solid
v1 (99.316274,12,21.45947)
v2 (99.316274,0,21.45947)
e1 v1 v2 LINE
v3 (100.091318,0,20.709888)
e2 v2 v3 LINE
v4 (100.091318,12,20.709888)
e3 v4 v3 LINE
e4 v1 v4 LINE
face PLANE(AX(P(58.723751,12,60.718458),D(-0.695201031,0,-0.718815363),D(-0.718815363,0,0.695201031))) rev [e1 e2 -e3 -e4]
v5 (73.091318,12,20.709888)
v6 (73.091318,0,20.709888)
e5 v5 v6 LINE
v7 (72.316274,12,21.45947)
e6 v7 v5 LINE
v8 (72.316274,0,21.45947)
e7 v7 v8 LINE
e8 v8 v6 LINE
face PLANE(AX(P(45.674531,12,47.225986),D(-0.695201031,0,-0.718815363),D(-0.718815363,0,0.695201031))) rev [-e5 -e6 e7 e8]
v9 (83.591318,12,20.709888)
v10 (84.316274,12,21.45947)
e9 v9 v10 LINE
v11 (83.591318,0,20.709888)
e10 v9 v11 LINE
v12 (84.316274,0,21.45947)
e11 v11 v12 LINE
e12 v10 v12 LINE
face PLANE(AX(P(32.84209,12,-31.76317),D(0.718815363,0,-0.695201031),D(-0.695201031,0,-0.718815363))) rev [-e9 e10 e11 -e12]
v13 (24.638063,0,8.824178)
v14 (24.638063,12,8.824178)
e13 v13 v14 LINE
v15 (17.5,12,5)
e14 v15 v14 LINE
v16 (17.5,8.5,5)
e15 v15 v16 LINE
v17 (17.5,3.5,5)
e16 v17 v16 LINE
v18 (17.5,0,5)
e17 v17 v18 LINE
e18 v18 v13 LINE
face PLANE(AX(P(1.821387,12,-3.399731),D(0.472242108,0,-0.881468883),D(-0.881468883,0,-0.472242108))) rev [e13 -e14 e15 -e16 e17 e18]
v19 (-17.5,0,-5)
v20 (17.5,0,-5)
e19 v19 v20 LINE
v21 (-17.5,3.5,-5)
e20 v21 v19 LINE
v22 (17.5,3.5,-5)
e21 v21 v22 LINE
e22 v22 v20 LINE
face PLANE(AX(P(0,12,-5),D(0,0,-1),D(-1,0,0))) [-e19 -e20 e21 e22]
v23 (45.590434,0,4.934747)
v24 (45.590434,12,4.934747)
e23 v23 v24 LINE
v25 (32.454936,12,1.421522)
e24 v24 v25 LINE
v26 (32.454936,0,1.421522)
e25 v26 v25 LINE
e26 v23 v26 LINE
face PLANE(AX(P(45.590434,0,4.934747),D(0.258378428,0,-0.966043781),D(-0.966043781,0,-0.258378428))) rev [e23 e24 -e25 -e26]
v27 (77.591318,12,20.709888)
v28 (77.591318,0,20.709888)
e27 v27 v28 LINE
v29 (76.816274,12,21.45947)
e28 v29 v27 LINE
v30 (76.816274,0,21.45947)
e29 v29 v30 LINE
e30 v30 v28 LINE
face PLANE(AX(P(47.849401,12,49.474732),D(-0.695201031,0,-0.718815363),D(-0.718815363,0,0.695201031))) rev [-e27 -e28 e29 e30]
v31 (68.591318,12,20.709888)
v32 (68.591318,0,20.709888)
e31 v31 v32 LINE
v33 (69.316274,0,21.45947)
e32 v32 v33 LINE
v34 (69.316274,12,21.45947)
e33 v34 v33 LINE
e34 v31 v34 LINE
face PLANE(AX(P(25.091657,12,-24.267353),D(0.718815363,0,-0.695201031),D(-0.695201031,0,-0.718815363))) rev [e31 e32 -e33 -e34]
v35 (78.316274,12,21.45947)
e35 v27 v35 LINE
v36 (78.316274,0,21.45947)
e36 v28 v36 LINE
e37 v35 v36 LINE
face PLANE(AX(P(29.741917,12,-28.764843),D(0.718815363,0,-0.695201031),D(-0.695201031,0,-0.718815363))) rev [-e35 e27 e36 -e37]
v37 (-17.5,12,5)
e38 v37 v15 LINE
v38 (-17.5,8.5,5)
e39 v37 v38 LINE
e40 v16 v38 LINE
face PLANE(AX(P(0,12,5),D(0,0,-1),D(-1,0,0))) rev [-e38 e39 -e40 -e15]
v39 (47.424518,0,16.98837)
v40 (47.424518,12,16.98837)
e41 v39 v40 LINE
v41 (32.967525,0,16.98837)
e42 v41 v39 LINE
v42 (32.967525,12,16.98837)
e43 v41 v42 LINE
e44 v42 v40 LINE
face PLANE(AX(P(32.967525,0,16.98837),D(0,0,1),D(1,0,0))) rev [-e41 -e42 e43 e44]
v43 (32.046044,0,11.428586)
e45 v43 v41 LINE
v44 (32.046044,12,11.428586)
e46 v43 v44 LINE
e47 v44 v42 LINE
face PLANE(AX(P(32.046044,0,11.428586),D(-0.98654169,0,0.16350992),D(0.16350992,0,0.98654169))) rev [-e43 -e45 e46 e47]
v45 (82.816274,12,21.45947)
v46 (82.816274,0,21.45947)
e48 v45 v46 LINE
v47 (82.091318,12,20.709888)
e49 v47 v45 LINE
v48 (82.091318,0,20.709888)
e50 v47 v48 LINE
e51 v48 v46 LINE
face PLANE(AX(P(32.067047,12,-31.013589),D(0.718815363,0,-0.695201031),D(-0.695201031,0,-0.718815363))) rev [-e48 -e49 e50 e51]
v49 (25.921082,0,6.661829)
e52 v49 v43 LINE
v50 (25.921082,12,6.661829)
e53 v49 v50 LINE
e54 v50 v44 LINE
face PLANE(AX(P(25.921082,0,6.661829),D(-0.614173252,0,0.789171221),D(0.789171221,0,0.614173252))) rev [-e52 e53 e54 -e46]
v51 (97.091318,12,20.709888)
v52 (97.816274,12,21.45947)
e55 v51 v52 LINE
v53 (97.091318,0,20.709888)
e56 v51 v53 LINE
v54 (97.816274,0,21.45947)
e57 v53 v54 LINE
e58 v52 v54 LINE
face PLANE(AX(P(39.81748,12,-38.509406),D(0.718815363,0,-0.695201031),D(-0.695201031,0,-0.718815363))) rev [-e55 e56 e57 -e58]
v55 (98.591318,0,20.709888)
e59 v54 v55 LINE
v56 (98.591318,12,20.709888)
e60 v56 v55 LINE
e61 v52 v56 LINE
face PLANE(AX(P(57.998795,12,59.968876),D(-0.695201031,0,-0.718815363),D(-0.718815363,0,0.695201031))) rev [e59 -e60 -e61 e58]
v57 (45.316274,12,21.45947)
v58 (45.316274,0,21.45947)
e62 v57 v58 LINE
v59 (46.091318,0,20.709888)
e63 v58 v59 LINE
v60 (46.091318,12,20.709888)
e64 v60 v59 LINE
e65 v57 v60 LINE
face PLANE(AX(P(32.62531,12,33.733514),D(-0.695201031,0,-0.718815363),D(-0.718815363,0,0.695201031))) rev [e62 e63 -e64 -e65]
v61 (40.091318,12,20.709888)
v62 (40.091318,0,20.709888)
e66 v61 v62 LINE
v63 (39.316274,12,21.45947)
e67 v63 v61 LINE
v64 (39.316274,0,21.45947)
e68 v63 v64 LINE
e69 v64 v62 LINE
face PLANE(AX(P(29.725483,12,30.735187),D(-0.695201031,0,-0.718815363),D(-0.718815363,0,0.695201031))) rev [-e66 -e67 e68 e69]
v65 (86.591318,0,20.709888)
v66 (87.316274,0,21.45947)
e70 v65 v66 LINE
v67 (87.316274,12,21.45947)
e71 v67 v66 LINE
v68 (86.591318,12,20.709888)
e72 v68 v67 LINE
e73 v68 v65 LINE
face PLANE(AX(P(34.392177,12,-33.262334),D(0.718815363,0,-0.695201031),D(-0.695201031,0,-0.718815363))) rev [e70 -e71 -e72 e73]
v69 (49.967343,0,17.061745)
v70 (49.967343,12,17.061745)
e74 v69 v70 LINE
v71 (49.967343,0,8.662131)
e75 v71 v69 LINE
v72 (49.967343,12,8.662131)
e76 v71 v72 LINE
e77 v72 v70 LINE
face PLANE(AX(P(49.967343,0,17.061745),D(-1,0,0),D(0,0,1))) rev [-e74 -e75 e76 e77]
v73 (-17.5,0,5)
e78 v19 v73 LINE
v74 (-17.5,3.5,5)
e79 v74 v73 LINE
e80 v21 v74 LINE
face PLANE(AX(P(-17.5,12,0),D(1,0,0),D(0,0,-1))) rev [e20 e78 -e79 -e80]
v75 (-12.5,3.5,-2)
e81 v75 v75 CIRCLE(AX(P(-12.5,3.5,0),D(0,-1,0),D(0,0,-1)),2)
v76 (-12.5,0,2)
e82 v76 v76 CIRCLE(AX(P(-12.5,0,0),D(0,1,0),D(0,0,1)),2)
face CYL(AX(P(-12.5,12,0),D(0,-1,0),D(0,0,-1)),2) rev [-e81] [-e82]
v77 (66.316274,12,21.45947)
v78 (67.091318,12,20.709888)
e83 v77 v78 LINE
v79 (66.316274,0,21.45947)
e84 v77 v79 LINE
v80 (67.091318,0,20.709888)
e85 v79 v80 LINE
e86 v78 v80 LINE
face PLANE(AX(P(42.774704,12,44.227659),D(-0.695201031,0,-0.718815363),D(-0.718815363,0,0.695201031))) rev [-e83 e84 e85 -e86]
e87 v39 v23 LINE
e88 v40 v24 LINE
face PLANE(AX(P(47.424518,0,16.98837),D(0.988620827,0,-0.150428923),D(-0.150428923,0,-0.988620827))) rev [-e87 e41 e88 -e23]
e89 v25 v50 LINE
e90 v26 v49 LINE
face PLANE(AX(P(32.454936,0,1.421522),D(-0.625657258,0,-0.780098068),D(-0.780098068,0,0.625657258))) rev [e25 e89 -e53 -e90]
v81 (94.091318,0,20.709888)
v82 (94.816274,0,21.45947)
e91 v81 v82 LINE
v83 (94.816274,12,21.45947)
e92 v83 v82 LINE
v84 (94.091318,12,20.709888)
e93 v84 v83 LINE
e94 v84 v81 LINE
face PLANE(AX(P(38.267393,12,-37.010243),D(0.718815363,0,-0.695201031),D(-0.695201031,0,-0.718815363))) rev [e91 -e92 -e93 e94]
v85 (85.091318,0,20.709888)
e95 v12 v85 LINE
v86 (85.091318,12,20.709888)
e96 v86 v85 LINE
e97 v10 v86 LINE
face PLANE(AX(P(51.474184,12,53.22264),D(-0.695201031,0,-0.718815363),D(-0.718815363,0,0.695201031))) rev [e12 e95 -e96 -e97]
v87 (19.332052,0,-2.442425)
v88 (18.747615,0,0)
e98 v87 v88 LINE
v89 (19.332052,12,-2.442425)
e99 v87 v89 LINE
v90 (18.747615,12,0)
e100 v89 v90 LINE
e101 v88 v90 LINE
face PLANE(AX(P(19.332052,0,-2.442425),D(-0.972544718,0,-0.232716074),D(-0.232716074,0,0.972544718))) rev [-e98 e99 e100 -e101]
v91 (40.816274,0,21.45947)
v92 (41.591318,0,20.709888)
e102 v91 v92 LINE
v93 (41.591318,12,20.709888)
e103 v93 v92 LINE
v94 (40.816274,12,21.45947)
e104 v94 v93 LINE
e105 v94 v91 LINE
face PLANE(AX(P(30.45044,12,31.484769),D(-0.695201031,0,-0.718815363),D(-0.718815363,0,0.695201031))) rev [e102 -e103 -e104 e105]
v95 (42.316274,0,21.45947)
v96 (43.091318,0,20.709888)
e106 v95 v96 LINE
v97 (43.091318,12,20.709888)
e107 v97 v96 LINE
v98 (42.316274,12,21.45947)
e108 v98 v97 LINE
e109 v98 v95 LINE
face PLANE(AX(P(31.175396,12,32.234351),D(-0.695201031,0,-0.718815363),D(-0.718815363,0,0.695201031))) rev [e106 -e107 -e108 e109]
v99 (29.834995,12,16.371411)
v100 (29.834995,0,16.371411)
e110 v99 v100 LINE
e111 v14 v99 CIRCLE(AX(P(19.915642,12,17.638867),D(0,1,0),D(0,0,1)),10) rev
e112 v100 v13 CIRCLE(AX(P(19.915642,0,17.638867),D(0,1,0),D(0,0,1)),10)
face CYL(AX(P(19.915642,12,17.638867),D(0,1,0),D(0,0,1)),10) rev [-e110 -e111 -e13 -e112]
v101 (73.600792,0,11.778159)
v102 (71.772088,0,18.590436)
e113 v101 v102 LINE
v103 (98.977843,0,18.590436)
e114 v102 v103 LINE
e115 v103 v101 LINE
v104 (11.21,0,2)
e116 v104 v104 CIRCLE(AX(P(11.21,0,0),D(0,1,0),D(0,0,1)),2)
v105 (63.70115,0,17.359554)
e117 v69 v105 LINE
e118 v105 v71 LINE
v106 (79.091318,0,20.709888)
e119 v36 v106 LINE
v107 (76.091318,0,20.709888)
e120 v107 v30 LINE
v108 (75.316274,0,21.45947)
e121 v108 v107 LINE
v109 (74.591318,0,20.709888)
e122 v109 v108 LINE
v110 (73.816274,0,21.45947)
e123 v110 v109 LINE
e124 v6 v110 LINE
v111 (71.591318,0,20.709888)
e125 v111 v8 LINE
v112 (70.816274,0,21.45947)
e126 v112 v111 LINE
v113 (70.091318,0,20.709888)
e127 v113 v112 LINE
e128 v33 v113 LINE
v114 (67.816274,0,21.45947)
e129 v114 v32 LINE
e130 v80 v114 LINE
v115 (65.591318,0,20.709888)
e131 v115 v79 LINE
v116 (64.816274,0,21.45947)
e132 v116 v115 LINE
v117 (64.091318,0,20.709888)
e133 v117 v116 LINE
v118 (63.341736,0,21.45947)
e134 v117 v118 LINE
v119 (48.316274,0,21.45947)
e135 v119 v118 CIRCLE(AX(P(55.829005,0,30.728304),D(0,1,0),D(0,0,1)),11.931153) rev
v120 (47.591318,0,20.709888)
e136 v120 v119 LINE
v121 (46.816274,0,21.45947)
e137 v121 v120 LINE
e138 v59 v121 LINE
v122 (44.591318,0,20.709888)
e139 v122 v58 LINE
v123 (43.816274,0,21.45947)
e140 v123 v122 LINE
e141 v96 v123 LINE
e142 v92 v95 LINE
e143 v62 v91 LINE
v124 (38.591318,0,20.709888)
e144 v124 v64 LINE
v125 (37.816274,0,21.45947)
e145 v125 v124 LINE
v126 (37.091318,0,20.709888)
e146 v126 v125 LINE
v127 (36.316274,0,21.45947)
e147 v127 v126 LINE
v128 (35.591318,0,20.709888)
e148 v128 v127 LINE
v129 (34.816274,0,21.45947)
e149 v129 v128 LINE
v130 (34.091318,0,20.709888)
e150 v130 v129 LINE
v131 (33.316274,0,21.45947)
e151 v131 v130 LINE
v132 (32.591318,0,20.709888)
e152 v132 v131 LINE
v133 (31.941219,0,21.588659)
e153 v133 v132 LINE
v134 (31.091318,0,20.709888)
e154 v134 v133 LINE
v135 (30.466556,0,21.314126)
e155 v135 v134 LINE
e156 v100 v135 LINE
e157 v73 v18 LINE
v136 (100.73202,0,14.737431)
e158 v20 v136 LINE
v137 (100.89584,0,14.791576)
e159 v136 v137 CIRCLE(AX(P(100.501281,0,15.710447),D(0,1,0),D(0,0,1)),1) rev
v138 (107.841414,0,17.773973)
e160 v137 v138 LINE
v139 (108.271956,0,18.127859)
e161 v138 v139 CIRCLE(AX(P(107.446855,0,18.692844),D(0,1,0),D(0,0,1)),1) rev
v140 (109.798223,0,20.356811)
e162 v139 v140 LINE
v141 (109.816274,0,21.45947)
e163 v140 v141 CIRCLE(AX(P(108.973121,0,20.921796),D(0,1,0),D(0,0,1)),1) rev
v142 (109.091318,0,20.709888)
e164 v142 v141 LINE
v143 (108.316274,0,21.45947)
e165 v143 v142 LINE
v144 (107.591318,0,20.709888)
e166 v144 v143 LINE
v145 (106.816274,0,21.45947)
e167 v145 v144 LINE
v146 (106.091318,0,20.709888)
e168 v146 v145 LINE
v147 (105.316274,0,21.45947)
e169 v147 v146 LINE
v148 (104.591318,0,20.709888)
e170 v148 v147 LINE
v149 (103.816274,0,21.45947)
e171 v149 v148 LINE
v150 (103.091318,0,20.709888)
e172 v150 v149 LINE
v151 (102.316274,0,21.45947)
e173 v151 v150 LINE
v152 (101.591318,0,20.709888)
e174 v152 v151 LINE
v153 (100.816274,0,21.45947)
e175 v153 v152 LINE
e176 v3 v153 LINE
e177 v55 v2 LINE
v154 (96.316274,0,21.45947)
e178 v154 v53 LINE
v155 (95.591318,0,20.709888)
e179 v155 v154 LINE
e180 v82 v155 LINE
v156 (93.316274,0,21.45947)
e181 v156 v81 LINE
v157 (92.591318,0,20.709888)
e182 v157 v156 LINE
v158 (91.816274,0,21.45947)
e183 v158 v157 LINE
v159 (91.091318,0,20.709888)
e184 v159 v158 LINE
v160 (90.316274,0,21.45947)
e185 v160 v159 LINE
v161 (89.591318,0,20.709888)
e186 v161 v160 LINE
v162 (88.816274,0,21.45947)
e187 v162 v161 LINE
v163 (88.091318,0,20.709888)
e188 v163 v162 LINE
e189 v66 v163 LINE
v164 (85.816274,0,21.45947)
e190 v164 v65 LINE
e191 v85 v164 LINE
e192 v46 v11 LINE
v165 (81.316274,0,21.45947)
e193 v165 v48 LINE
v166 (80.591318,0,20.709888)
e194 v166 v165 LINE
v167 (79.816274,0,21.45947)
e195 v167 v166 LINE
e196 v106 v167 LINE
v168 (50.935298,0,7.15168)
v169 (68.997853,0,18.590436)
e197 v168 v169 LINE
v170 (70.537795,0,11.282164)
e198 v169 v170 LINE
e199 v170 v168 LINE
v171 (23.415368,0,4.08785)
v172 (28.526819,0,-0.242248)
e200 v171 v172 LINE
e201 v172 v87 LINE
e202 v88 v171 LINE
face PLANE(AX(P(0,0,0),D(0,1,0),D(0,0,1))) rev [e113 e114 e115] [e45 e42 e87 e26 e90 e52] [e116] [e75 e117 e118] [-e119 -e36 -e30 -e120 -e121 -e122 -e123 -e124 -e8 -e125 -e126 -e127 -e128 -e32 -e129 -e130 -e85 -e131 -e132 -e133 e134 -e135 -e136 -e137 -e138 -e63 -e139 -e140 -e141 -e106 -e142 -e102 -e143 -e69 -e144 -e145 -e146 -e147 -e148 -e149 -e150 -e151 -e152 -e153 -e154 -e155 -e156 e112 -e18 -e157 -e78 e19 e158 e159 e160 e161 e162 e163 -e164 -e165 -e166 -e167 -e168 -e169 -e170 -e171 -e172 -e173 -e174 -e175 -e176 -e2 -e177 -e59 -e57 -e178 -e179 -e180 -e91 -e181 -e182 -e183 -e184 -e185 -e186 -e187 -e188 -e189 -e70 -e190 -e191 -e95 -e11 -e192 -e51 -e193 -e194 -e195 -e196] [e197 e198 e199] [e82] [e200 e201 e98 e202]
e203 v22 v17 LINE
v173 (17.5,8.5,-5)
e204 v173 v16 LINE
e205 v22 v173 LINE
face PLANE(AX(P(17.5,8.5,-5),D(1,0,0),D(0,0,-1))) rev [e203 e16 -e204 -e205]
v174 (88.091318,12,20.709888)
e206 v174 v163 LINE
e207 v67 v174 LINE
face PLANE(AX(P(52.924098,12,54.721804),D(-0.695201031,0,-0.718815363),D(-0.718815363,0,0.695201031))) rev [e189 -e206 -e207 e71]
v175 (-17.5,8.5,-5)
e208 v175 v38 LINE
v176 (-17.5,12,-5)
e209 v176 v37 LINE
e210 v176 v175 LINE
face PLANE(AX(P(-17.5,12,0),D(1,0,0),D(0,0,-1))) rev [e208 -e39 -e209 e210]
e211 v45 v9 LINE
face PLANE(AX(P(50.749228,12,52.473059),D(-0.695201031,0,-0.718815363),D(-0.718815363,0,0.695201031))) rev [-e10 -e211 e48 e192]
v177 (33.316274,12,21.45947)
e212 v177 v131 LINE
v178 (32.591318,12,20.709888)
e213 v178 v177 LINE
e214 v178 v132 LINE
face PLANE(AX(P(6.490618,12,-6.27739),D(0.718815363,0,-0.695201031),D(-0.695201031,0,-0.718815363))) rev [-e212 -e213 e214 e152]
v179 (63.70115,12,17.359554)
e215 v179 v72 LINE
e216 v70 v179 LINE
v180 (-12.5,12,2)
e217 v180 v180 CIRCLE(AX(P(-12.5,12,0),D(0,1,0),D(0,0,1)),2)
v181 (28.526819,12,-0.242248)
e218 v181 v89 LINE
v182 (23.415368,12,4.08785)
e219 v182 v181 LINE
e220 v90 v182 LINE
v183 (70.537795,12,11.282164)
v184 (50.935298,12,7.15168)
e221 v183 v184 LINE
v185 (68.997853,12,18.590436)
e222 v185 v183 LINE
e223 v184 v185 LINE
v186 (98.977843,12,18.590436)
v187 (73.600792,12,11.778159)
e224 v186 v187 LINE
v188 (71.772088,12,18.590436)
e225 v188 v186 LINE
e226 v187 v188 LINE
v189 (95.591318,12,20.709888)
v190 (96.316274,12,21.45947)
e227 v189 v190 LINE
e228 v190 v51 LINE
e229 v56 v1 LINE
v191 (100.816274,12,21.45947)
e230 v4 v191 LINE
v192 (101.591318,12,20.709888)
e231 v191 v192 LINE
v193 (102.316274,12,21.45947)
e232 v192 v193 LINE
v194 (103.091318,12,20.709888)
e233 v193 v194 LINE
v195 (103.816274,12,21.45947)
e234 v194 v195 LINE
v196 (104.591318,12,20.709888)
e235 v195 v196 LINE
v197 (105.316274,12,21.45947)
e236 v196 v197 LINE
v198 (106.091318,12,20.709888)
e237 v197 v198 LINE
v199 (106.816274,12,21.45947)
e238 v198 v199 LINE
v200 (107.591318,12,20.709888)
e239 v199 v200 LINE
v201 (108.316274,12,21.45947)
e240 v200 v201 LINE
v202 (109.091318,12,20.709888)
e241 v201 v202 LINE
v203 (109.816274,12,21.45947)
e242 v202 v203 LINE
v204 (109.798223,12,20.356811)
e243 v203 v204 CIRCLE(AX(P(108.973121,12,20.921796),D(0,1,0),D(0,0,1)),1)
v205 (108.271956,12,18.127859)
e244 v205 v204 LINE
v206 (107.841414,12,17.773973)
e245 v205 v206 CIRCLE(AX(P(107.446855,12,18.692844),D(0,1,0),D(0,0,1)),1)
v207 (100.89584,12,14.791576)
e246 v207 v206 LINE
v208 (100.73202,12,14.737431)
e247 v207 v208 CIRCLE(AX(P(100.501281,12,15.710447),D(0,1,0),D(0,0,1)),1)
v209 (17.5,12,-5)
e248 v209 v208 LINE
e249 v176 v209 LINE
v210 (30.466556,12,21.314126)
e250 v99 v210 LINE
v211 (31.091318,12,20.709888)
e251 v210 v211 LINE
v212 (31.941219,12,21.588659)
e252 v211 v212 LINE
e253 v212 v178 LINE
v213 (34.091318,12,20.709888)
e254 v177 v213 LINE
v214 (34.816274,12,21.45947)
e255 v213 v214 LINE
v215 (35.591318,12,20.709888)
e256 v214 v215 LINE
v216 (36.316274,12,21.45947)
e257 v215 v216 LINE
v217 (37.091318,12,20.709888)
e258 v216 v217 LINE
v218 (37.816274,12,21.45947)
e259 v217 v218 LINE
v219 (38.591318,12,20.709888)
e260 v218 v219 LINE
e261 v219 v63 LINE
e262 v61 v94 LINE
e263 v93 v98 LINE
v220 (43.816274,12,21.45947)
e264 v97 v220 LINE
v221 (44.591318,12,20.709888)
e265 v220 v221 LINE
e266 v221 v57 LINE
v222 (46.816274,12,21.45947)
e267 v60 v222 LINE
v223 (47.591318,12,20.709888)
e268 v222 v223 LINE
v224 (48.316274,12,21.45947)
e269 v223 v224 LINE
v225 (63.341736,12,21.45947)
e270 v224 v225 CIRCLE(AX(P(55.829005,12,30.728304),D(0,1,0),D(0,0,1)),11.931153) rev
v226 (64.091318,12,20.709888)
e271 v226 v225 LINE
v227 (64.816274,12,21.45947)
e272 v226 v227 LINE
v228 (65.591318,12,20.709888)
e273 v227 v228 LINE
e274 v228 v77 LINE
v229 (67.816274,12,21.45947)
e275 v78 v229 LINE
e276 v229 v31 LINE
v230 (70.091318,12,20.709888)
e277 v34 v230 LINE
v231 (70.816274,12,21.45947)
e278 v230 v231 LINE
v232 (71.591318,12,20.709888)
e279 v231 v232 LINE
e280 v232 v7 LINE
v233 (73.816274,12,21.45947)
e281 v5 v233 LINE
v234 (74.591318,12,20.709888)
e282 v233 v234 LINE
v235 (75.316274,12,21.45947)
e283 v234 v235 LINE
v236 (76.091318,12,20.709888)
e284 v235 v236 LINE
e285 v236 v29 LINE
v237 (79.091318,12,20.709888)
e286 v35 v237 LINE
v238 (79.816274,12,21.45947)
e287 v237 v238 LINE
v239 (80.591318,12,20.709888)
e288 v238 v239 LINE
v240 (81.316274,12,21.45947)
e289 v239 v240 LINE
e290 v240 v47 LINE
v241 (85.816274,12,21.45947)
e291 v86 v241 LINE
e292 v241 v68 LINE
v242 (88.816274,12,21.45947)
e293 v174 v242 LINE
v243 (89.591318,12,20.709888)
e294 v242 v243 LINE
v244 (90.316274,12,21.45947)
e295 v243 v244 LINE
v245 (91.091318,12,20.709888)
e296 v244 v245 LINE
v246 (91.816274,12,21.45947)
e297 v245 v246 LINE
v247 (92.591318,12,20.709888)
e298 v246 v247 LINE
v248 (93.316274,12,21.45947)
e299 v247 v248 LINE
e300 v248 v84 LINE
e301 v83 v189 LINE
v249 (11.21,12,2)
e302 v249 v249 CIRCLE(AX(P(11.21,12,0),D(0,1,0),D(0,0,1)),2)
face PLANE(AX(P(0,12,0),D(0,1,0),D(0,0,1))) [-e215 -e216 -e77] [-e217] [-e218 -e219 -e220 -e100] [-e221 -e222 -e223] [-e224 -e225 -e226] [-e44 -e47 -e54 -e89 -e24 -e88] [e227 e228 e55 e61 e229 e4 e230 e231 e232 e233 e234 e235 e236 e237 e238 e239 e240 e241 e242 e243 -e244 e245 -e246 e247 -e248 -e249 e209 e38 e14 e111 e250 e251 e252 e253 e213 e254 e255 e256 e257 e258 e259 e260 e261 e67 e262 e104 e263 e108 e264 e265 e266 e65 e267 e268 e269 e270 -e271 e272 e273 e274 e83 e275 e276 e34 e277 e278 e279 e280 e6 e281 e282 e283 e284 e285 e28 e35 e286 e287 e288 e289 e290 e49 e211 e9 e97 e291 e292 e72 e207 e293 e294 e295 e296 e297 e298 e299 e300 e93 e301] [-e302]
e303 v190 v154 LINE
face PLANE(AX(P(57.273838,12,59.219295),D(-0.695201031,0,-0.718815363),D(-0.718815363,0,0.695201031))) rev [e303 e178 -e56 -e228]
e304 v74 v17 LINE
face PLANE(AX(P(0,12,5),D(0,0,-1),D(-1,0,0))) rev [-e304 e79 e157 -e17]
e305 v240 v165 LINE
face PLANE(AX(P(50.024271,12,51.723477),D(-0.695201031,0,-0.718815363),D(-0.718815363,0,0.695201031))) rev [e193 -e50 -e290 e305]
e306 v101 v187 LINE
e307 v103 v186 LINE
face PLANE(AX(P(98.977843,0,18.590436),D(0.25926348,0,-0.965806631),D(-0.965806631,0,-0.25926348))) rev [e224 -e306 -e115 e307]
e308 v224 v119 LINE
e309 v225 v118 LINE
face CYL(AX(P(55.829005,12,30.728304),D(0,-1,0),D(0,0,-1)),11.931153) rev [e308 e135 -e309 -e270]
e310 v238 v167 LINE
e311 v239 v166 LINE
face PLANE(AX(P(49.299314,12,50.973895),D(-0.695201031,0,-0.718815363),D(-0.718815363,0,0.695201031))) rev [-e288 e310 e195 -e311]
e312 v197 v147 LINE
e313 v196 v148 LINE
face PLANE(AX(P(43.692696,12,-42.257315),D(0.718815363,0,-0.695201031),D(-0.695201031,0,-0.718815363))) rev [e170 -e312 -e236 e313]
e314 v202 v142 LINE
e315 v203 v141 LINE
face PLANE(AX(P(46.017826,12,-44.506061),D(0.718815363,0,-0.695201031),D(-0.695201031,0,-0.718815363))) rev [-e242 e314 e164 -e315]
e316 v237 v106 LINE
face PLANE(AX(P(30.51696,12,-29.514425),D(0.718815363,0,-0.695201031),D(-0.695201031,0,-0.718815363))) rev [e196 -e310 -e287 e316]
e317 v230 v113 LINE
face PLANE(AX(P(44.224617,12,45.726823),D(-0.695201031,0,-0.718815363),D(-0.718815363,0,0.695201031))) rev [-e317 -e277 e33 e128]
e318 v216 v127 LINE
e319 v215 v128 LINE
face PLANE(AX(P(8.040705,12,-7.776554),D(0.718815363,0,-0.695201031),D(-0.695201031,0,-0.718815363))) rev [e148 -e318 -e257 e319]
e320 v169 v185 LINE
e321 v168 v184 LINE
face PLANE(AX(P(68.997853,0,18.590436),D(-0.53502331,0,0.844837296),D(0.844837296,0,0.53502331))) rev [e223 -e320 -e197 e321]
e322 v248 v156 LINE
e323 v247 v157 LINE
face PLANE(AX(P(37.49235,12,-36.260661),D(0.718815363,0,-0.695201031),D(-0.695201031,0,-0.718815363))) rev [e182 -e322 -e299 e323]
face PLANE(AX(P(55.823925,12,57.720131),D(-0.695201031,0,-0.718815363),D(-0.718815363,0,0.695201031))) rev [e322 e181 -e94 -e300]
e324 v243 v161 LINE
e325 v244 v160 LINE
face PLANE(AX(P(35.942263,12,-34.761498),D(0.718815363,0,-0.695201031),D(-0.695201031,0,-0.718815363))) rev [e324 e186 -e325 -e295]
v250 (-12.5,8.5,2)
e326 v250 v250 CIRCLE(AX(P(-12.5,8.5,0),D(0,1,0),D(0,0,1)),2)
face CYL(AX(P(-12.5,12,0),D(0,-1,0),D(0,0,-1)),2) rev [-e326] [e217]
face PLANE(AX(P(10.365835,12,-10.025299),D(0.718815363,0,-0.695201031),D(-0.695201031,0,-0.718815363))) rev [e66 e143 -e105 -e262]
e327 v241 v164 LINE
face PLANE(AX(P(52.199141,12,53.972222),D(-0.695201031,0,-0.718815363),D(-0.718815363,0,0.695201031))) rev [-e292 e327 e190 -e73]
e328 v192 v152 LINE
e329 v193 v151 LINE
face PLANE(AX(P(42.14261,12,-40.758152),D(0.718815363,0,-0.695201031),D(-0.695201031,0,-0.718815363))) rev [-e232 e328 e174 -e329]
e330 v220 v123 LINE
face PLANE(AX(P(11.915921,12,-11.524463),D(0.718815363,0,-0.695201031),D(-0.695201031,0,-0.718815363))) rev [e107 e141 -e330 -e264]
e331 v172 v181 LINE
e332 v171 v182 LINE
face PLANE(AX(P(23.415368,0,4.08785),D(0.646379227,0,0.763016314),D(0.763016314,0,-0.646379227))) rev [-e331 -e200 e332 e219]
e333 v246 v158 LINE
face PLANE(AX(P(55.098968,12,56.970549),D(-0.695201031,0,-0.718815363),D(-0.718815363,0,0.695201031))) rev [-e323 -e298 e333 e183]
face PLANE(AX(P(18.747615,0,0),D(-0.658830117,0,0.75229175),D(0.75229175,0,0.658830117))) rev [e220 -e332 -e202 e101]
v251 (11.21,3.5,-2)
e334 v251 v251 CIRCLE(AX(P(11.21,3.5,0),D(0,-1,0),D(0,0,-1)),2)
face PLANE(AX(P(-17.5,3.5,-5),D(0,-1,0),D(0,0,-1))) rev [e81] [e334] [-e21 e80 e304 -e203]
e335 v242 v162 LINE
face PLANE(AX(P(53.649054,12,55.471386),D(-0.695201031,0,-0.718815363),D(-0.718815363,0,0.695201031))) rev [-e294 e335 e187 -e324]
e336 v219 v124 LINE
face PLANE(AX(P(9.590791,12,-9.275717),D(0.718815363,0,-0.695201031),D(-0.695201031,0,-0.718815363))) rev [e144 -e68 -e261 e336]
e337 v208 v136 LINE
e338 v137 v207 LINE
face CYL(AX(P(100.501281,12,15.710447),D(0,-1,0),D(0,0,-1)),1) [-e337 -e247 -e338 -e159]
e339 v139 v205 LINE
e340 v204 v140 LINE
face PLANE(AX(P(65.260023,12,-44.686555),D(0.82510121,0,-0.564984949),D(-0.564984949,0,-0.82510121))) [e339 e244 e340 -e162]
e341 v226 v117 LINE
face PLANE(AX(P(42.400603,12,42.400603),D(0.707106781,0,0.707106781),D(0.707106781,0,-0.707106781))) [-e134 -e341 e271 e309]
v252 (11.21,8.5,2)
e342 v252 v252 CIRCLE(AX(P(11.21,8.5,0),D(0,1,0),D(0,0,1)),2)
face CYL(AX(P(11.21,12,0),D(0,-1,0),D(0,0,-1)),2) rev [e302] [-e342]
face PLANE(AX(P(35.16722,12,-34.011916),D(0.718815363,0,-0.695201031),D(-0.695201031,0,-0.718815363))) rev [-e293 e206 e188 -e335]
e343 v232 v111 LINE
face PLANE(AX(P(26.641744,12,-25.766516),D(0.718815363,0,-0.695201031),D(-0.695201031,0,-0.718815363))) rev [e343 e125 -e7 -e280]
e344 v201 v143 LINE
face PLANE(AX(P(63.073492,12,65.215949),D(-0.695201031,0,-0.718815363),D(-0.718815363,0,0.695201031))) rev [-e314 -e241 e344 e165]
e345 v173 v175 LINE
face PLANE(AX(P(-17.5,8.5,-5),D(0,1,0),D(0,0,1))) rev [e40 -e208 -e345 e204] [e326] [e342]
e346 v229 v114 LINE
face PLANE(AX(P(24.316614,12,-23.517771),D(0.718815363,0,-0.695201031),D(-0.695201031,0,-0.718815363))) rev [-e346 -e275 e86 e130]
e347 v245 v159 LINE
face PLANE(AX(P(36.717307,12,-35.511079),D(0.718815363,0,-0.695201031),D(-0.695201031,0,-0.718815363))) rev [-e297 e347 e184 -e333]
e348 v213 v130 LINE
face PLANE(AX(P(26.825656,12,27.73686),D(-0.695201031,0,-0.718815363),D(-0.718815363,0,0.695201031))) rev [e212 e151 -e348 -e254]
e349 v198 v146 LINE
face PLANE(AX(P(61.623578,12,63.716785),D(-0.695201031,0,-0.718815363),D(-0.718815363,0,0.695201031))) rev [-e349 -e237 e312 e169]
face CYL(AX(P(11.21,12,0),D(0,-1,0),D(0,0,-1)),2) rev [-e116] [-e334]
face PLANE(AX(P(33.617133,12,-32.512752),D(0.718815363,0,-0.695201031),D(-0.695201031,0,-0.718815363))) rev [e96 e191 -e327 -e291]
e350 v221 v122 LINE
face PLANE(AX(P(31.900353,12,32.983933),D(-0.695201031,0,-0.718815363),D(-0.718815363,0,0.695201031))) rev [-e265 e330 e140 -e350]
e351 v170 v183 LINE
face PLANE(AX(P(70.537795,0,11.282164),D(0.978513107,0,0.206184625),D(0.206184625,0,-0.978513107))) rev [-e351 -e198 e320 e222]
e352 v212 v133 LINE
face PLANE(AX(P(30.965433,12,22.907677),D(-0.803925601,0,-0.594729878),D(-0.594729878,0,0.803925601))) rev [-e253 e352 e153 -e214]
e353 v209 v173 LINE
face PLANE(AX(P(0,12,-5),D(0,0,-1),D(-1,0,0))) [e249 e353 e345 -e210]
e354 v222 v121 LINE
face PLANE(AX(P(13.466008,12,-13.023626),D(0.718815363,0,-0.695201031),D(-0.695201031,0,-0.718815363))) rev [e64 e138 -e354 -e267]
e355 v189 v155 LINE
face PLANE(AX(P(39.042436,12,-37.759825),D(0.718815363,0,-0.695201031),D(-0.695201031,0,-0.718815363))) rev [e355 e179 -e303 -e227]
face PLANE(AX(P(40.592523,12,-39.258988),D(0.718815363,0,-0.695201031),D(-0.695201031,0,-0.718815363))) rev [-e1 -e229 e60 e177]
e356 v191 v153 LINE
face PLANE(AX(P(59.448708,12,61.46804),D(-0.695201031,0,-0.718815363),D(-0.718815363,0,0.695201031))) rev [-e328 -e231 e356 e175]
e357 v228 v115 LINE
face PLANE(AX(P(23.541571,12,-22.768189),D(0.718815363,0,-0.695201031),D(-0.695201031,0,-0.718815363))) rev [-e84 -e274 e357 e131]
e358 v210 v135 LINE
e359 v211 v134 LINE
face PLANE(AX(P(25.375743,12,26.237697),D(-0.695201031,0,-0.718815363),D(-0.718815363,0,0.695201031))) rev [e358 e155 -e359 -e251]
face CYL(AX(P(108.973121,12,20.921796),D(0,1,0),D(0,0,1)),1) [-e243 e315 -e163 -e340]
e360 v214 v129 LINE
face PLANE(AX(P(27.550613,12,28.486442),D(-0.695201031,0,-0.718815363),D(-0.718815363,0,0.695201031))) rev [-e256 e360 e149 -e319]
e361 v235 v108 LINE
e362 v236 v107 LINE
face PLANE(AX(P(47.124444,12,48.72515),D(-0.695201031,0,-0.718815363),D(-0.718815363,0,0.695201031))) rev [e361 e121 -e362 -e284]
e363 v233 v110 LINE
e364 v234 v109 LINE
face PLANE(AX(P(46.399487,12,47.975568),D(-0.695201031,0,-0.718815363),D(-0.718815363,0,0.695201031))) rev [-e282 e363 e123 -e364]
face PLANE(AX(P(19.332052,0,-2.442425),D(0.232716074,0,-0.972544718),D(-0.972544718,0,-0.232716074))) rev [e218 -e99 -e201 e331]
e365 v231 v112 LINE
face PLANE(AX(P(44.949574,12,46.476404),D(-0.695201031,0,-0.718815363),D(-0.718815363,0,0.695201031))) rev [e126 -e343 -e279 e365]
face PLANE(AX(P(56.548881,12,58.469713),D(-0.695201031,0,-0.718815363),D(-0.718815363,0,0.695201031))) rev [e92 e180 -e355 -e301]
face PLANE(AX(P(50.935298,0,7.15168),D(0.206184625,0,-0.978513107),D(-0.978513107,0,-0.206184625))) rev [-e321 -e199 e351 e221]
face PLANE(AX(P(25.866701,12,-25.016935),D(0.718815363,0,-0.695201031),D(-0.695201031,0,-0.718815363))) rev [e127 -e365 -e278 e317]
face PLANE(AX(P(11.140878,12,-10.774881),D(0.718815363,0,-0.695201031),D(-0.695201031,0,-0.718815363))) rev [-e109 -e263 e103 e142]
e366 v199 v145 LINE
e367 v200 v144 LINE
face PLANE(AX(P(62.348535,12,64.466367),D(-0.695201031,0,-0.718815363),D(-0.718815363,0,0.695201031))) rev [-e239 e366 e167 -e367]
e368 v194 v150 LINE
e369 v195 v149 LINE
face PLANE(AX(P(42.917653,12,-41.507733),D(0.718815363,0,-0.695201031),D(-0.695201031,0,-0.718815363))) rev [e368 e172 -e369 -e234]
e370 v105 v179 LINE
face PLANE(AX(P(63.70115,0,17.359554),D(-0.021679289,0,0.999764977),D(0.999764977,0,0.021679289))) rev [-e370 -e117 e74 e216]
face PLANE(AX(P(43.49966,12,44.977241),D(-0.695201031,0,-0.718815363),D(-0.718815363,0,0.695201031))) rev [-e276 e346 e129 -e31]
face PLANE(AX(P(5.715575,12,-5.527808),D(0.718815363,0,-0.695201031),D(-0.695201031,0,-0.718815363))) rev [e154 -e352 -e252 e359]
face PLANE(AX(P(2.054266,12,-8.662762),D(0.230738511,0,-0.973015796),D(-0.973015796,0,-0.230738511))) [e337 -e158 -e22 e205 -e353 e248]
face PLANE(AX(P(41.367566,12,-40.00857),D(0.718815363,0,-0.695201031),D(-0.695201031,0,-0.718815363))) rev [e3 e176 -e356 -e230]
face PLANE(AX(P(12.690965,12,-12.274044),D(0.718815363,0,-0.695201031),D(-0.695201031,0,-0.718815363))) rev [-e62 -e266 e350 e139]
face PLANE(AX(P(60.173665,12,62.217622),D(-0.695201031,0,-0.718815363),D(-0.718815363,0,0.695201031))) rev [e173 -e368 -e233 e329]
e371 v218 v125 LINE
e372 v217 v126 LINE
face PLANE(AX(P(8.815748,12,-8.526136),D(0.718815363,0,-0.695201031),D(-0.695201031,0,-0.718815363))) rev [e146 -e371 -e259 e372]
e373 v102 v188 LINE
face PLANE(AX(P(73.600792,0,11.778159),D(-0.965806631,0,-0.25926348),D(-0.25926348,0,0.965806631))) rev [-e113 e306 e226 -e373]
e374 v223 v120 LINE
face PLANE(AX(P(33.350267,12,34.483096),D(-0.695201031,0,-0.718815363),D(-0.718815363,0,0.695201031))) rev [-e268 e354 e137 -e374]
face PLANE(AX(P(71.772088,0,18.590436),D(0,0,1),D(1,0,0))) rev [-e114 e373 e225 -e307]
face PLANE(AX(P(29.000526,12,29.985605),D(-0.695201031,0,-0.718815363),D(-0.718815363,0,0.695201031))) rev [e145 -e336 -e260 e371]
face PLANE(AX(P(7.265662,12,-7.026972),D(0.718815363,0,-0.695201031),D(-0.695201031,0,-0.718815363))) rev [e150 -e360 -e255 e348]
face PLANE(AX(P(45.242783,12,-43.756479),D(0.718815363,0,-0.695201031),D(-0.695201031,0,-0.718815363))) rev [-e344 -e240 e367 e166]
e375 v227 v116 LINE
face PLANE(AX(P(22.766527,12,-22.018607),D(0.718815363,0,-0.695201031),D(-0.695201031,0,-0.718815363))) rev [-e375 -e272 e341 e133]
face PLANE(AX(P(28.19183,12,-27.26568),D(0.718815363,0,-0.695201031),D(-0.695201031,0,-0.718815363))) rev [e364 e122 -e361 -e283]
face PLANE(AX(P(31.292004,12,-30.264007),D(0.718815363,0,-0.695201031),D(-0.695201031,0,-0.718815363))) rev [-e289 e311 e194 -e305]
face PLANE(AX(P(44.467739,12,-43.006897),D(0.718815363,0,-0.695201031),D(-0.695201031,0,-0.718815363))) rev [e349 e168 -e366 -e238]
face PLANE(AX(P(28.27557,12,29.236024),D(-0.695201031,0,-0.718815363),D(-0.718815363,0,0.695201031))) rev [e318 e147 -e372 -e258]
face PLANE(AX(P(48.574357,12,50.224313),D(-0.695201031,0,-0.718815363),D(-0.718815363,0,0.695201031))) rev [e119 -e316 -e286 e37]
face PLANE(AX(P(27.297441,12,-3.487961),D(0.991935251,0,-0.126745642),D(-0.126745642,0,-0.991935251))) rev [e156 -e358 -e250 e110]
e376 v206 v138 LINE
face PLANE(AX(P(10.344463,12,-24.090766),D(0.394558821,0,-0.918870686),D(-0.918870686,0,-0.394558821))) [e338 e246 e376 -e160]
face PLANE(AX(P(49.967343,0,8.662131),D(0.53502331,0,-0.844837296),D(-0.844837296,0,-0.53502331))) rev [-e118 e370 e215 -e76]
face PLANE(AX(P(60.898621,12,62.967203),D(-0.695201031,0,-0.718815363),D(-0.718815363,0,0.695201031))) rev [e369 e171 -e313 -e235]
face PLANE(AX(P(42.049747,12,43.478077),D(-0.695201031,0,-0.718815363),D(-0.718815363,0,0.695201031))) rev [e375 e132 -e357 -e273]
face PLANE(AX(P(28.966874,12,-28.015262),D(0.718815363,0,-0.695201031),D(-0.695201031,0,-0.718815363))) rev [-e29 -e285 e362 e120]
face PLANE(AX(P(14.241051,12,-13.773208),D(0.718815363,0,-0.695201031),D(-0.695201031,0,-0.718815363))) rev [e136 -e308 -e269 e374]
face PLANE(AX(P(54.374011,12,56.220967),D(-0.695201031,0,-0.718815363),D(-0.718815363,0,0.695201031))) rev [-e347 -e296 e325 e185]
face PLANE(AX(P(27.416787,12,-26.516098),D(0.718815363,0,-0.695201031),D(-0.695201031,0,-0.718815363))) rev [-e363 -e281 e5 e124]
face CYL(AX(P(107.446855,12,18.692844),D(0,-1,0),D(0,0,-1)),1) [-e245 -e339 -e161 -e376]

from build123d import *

# Parameters (mm, degrees)
SKETCH1_R           = 2
BOSS_EXTRUDE1_DEPTH = 12
SKETCH4_W           = 35
SKETCH4_H           = 5
CUT_EXTRUDE1_DEPTH  = 113.433125829
FILLET2_R           = 10
FILLET3_R           = 1
CUT_EXTRUDE2_DEPTH  = 12


with BuildPart() as part:
    # Sketch1 → Boss-Extrude1 (new body)
    with BuildSketch(Plane(origin=(0, 0, 0), x_dir=(1, 0, 0), z_dir=(0, 1, 0))):
        with BuildLine():
            Line((100.816274371, -14.757411095), (17.5, 5))
            Line((17.5, 5), (-17.5, 5))
            Line((-17.5, 5), (-17.5, -5))
            Line((-17.5, -5), (17.5, -5))
            Line((17.5, -5), (29.181673037, -11.258392105))
            Line((29.181673037, -11.258392105), (30.466555694, -21.314125588))
            Line((30.466555694, -21.314125588), (31.091317661, -20.709888136))
            Line((31.091317661, -20.709888136), (31.94121893, -21.588658537))
            Line((31.94121893, -21.588658537), (32.591317661, -20.709888136))
            Line((32.591317661, -20.709888136), (33.316274371, -21.459469908))
            Line((33.316274371, -21.459469908), (34.091317661, -20.709888136))
            Line((34.091317661, -20.709888136), (34.816274371, -21.459469908))
            Line((34.816274371, -21.459469908), (35.591317661, -20.709888136))
            Line((35.591317661, -20.709888136), (36.316274371, -21.459469908))
            Line((36.316274371, -21.459469908), (37.091317661, -20.709888136))
            Line((37.091317661, -20.709888136), (37.816274371, -21.459469908))
            Line((37.816274371, -21.459469908), (38.591317661, -20.709888136))
            Line((38.591317661, -20.709888136), (39.316274371, -21.459469908))
            Line((39.316274371, -21.459469908), (40.091317661, -20.709888136))
            Line((40.091317661, -20.709888136), (40.816274371, -21.459469908))
            Line((40.816274371, -21.459469908), (41.591317661, -20.709888136))
            Line((41.591317661, -20.709888136), (42.316274371, -21.459469908))
            Line((42.316274371, -21.459469908), (43.091317661, -20.709888136))
            Line((43.091317661, -20.709888136), (43.816274371, -21.459469908))
            Line((43.816274371, -21.459469908), (44.591317661, -20.709888136))
            Line((44.591317661, -20.709888136), (45.316274371, -21.459469908))
            Line((45.316274371, -21.459469908), (46.091317661, -20.709888136))
            Line((46.091317661, -20.709888136), (46.816274371, -21.459469908))
            Line((46.816274371, -21.459469908), (47.591317661, -20.709888136))
            Line((47.591317661, -20.709888136), (48.316274371, -21.459469908))
            ThreePointArc((48.316274371, -21.459469908), (55.82900513, -18.797151194), (63.341735888, -21.459469908))
            Line((63.341735888, -21.459469908), (64.091317661, -20.709888136))
            Line((64.091317661, -20.709888136), (64.816274371, -21.459469908))
            Line((64.816274371, -21.459469908), (65.591317661, -20.709888136))
            Line((65.591317661, -20.709888136), (66.316274371, -21.459469908))
            Line((66.316274371, -21.459469908), (67.091317661, -20.709888136))
            Line((67.091317661, -20.709888136), (67.816274371, -21.459469908))
            Line((67.816274371, -21.459469908), (68.591317661, -20.709888136))
            Line((68.591317661, -20.709888136), (69.316274371, -21.459469908))
            Line((69.316274371, -21.459469908), (70.091317661, -20.709888136))
            Line((70.091317661, -20.709888136), (70.816274371, -21.459469908))
            Line((70.816274371, -21.459469908), (71.591317661, -20.709888136))
            Line((71.591317661, -20.709888136), (72.316274371, -21.459469908))
            Line((72.316274371, -21.459469908), (73.091317661, -20.709888136))
            Line((73.091317661, -20.709888136), (73.816274371, -21.459469908))
            Line((73.816274371, -21.459469908), (74.591317661, -20.709888136))
            Line((74.591317661, -20.709888136), (75.316274371, -21.459469908))
            Line((75.316274371, -21.459469908), (76.091317661, -20.709888136))
            Line((76.091317661, -20.709888136), (76.816274371, -21.459469908))
            Line((76.816274371, -21.459469908), (77.591317661, -20.709888136))
            Line((77.591317661, -20.709888136), (78.316274371, -21.459469908))
            Line((78.316274371, -21.459469908), (79.091317661, -20.709888136))
            Line((79.091317661, -20.709888136), (79.816274371, -21.459469908))
            Line((79.816274371, -21.459469908), (80.591317661, -20.709888136))
            Line((80.591317661, -20.709888136), (81.316274371, -21.459469908))
            Line((81.316274371, -21.459469908), (82.091317661, -20.709888136))
            Line((82.091317661, -20.709888136), (82.816274371, -21.459469908))
            Line((82.816274371, -21.459469908), (83.591317661, -20.709888136))
            Line((83.591317661, -20.709888136), (84.316274371, -21.459469908))
            Line((84.316274371, -21.459469908), (85.091317661, -20.709888136))
            Line((85.091317661, -20.709888136), (85.816274371, -21.459469908))
            Line((85.816274371, -21.459469908), (86.591317661, -20.709888136))
            Line((86.591317661, -20.709888136), (87.316274371, -21.459469908))
            Line((87.316274371, -21.459469908), (88.091317661, -20.709888136))
            Line((88.091317661, -20.709888136), (88.816274371, -21.459469908))
            Line((88.816274371, -21.459469908), (89.591317661, -20.709888136))
            Line((89.591317661, -20.709888136), (90.316274371, -21.459469908))
            Line((90.316274371, -21.459469908), (91.091317661, -20.709888136))
            Line((91.091317661, -20.709888136), (91.816274371, -21.459469908))
            Line((91.816274371, -21.459469908), (92.591317661, -20.709888136))
            Line((92.591317661, -20.709888136), (93.316274371, -21.459469908))
            Line((93.316274371, -21.459469908), (94.091317661, -20.709888136))
            Line((94.091317661, -20.709888136), (94.816274371, -21.459469908))
            Line((94.816274371, -21.459469908), (95.591317661, -20.709888136))
            Line((95.591317661, -20.709888136), (96.316274371, -21.459469908))
            Line((96.316274371, -21.459469908), (97.091317661, -20.709888136))
            Line((97.091317661, -20.709888136), (97.816274371, -21.459469908))
            Line((97.816274371, -21.459469908), (98.591317661, -20.709888136))
            Line((98.591317661, -20.709888136), (99.316274371, -21.459469908))
            Line((99.316274371, -21.459469908), (100.091317661, -20.709888136))
            Line((100.091317661, -20.709888136), (100.816274371, -21.459469908))
            Line((100.816274371, -21.459469908), (101.591317661, -20.709888136))
            Line((101.591317661, -20.709888136), (102.316274371, -21.459469908))
            Line((102.316274371, -21.459469908), (103.091317661, -20.709888136))
            Line((103.091317661, -20.709888136), (103.816274371, -21.459469908))
            Line((103.816274371, -21.459469908), (104.591317661, -20.709888136))
            Line((104.591317661, -20.709888136), (105.316274371, -21.459469908))
            Line((105.316274371, -21.459469908), (106.091317661, -20.709888136))
            Line((106.091317661, -20.709888136), (106.816274371, -21.459469908))
            Line((106.816274371, -21.459469908), (107.591317661, -20.709888136))
            Line((107.591317661, -20.709888136), (108.316274371, -21.459469908))
            Line((108.316274371, -21.459469908), (109.091317661, -20.709888136))
            Line((109.091317661, -20.709888136), (109.816274371, -21.459469908))
            Line((109.816274371, -21.459469908), (110.553264048, -21.459469908))
            Line((110.553264048, -21.459469908), (108.108025111, -17.888455122))
            Line((108.108025111, -17.888455122), (100.816274371, -14.757411095))
        make_face()
        with Locations(Location((11.21, 0, 0), (0, 0, 270))):
            Circle(SKETCH1_R, mode=Mode.SUBTRACT)
        with Locations(Location((-12.5, 0, 0), (0, 0, 270))):
            Circle(SKETCH1_R, mode=Mode.SUBTRACT)
    extrude(amount=BOSS_EXTRUDE1_DEPTH)

    # Sketch4 → Cut-Extrude1 (cut, through all)
    with BuildSketch(Plane.XY.offset(5)):
        with Locations((0, 6)):
            Rectangle(SKETCH4_W, SKETCH4_H)
    extrude(amount=-CUT_EXTRUDE1_DEPTH, mode=Mode.SUBTRACT)

    # Fillet2
    fillet2_edges = [part.edges().sort_by_distance(p)[0] for p in [
        (29.181673037, 6, 11.258392105),
    ]]
    fillet(fillet2_edges, radius=FILLET2_R)

    # Fillet3
    # the kernel refuses this fillet: 1 mm, written as the material it takes off along each edge
    with BuildSketch(Plane(origin=(100.816274371, -0.216477457, 14.757411095), x_dir=(-0.9730157961539994, 0, -0.23073851094864703), z_dir=(0, 1, 0))) as fillet3_piece_1:
        with BuildLine():
            CenterArc((FILLET3_R * 0.0865909827585, FILLET3_R), FILLET3_R, 260.102093181, 9.897906819)
            Line((-FILLET3_R * 0.0853021285033, FILLET3_R * 0.0148843934336), (-FILLET3_R * 0.0887399907286, -FILLET3_R * 0.00481791869774))
            Line((-FILLET3_R * 0.0887399907286, -FILLET3_R * 0.00481791869774), (-FILLET3_R * 0.00173181965517, -FILLET3_R * 0.02))
            Line((-FILLET3_R * 0.00173181965517, -FILLET3_R * 0.02), (FILLET3_R * 0.0865909827585, -FILLET3_R * 0.02))
            Line((FILLET3_R * 0.0865909827585, -FILLET3_R * 0.02), (FILLET3_R * 0.0865909827585, 0))
        make_face()
    extrude(amount=12.432954914, mode=Mode.SUBTRACT)
    with BuildSketch(Plane(origin=(108.108025111, -0.725377826, 17.888455122), x_dir=(-0.9188706856920634, 0, -0.3945588206792459), z_dir=(0, 1, 0))) as fillet3_piece_2:
        with BuildLine():
            CenterArc((FILLET3_R * 0.29015113035, FILLET3_R), FILLET3_R, 237.639707831, 32.360292169)
            Line((-FILLET3_R * 0.245090389396, FILLET3_R * 0.155300931965), (-FILLET3_R * 0.255795219791, FILLET3_R * 0.138406950604))
            Line((-FILLET3_R * 0.255795219791, FILLET3_R * 0.138406950604), (-FILLET3_R * 0.005803022607, -FILLET3_R * 0.02))
            Line((-FILLET3_R * 0.005803022607, -FILLET3_R * 0.02), (FILLET3_R * 0.29015113035, -FILLET3_R * 0.02))
            Line((FILLET3_R * 0.29015113035, -FILLET3_R * 0.02), (FILLET3_R * 0.29015113035, 0))
        make_face()
    extrude(amount=13.450755652, mode=Mode.SUBTRACT)
    with BuildSketch(Plane(origin=(110.553264048, -3.340980233, 21.459469908), x_dir=(-0.56498494903948, 0, -0.8251012103729192), z_dir=(0, 1, 0))) as fillet3_piece_3:
        with BuildLine():
            CenterArc((1.336392093, 1), FILLET3_R, 203.073330595, 66.926669405)
            Line((0.416388075, 0.608091074), (0.397987995, 0.600252896))
            ThreePointArc((0.397987995, 0.600252896), (0.191692013, 0.315345236), (-0.016502024, 0.011299699))
            Line((-0.016502024, 0.011299699), (0, -0.02))
            Line((0, -0.02), (1.336392093, -0.02))
            Line((1.336392093, -0.02), (1.336392093, 0))
        make_face()
    extrude(amount=18.681960466, mode=Mode.SUBTRACT)

    # Sketch5 → Cut-Extrude2 (cut)
    with BuildSketch(Plane(origin=(0, 12, 0), x_dir=(1, 0, 0), z_dir=(0, 1, 0))):
        Polygon((19.332052257, 2.4424245), (28.526818603, 0.242248117), (23.41536762, -4.087850301), (18.747614926, 0), align=None)
        Polygon((25.921082251, -6.661828657), (32.046043612, -11.428585655), (32.967525074, -16.9883699), (47.424517669, -16.9883699), (45.590433757, -4.934746753), (32.454936428, -1.421521761), align=None)
        Polygon((50.93529797, -7.151679552), (70.537795207, -11.282164386), (68.99785337, -18.590436131), align=None)
        Polygon((49.967342783, -8.662131451), (63.701149707, -17.359553871), (49.967342783, -17.061744713), align=None)
        Polygon((71.772087814, -18.590436131), (98.977842755, -18.590436131), (73.60079207, -11.778158935), align=None)
    extrude(amount=-CUT_EXTRUDE2_DEPTH, mode=Mode.SUBTRACT)


solid = part.part
